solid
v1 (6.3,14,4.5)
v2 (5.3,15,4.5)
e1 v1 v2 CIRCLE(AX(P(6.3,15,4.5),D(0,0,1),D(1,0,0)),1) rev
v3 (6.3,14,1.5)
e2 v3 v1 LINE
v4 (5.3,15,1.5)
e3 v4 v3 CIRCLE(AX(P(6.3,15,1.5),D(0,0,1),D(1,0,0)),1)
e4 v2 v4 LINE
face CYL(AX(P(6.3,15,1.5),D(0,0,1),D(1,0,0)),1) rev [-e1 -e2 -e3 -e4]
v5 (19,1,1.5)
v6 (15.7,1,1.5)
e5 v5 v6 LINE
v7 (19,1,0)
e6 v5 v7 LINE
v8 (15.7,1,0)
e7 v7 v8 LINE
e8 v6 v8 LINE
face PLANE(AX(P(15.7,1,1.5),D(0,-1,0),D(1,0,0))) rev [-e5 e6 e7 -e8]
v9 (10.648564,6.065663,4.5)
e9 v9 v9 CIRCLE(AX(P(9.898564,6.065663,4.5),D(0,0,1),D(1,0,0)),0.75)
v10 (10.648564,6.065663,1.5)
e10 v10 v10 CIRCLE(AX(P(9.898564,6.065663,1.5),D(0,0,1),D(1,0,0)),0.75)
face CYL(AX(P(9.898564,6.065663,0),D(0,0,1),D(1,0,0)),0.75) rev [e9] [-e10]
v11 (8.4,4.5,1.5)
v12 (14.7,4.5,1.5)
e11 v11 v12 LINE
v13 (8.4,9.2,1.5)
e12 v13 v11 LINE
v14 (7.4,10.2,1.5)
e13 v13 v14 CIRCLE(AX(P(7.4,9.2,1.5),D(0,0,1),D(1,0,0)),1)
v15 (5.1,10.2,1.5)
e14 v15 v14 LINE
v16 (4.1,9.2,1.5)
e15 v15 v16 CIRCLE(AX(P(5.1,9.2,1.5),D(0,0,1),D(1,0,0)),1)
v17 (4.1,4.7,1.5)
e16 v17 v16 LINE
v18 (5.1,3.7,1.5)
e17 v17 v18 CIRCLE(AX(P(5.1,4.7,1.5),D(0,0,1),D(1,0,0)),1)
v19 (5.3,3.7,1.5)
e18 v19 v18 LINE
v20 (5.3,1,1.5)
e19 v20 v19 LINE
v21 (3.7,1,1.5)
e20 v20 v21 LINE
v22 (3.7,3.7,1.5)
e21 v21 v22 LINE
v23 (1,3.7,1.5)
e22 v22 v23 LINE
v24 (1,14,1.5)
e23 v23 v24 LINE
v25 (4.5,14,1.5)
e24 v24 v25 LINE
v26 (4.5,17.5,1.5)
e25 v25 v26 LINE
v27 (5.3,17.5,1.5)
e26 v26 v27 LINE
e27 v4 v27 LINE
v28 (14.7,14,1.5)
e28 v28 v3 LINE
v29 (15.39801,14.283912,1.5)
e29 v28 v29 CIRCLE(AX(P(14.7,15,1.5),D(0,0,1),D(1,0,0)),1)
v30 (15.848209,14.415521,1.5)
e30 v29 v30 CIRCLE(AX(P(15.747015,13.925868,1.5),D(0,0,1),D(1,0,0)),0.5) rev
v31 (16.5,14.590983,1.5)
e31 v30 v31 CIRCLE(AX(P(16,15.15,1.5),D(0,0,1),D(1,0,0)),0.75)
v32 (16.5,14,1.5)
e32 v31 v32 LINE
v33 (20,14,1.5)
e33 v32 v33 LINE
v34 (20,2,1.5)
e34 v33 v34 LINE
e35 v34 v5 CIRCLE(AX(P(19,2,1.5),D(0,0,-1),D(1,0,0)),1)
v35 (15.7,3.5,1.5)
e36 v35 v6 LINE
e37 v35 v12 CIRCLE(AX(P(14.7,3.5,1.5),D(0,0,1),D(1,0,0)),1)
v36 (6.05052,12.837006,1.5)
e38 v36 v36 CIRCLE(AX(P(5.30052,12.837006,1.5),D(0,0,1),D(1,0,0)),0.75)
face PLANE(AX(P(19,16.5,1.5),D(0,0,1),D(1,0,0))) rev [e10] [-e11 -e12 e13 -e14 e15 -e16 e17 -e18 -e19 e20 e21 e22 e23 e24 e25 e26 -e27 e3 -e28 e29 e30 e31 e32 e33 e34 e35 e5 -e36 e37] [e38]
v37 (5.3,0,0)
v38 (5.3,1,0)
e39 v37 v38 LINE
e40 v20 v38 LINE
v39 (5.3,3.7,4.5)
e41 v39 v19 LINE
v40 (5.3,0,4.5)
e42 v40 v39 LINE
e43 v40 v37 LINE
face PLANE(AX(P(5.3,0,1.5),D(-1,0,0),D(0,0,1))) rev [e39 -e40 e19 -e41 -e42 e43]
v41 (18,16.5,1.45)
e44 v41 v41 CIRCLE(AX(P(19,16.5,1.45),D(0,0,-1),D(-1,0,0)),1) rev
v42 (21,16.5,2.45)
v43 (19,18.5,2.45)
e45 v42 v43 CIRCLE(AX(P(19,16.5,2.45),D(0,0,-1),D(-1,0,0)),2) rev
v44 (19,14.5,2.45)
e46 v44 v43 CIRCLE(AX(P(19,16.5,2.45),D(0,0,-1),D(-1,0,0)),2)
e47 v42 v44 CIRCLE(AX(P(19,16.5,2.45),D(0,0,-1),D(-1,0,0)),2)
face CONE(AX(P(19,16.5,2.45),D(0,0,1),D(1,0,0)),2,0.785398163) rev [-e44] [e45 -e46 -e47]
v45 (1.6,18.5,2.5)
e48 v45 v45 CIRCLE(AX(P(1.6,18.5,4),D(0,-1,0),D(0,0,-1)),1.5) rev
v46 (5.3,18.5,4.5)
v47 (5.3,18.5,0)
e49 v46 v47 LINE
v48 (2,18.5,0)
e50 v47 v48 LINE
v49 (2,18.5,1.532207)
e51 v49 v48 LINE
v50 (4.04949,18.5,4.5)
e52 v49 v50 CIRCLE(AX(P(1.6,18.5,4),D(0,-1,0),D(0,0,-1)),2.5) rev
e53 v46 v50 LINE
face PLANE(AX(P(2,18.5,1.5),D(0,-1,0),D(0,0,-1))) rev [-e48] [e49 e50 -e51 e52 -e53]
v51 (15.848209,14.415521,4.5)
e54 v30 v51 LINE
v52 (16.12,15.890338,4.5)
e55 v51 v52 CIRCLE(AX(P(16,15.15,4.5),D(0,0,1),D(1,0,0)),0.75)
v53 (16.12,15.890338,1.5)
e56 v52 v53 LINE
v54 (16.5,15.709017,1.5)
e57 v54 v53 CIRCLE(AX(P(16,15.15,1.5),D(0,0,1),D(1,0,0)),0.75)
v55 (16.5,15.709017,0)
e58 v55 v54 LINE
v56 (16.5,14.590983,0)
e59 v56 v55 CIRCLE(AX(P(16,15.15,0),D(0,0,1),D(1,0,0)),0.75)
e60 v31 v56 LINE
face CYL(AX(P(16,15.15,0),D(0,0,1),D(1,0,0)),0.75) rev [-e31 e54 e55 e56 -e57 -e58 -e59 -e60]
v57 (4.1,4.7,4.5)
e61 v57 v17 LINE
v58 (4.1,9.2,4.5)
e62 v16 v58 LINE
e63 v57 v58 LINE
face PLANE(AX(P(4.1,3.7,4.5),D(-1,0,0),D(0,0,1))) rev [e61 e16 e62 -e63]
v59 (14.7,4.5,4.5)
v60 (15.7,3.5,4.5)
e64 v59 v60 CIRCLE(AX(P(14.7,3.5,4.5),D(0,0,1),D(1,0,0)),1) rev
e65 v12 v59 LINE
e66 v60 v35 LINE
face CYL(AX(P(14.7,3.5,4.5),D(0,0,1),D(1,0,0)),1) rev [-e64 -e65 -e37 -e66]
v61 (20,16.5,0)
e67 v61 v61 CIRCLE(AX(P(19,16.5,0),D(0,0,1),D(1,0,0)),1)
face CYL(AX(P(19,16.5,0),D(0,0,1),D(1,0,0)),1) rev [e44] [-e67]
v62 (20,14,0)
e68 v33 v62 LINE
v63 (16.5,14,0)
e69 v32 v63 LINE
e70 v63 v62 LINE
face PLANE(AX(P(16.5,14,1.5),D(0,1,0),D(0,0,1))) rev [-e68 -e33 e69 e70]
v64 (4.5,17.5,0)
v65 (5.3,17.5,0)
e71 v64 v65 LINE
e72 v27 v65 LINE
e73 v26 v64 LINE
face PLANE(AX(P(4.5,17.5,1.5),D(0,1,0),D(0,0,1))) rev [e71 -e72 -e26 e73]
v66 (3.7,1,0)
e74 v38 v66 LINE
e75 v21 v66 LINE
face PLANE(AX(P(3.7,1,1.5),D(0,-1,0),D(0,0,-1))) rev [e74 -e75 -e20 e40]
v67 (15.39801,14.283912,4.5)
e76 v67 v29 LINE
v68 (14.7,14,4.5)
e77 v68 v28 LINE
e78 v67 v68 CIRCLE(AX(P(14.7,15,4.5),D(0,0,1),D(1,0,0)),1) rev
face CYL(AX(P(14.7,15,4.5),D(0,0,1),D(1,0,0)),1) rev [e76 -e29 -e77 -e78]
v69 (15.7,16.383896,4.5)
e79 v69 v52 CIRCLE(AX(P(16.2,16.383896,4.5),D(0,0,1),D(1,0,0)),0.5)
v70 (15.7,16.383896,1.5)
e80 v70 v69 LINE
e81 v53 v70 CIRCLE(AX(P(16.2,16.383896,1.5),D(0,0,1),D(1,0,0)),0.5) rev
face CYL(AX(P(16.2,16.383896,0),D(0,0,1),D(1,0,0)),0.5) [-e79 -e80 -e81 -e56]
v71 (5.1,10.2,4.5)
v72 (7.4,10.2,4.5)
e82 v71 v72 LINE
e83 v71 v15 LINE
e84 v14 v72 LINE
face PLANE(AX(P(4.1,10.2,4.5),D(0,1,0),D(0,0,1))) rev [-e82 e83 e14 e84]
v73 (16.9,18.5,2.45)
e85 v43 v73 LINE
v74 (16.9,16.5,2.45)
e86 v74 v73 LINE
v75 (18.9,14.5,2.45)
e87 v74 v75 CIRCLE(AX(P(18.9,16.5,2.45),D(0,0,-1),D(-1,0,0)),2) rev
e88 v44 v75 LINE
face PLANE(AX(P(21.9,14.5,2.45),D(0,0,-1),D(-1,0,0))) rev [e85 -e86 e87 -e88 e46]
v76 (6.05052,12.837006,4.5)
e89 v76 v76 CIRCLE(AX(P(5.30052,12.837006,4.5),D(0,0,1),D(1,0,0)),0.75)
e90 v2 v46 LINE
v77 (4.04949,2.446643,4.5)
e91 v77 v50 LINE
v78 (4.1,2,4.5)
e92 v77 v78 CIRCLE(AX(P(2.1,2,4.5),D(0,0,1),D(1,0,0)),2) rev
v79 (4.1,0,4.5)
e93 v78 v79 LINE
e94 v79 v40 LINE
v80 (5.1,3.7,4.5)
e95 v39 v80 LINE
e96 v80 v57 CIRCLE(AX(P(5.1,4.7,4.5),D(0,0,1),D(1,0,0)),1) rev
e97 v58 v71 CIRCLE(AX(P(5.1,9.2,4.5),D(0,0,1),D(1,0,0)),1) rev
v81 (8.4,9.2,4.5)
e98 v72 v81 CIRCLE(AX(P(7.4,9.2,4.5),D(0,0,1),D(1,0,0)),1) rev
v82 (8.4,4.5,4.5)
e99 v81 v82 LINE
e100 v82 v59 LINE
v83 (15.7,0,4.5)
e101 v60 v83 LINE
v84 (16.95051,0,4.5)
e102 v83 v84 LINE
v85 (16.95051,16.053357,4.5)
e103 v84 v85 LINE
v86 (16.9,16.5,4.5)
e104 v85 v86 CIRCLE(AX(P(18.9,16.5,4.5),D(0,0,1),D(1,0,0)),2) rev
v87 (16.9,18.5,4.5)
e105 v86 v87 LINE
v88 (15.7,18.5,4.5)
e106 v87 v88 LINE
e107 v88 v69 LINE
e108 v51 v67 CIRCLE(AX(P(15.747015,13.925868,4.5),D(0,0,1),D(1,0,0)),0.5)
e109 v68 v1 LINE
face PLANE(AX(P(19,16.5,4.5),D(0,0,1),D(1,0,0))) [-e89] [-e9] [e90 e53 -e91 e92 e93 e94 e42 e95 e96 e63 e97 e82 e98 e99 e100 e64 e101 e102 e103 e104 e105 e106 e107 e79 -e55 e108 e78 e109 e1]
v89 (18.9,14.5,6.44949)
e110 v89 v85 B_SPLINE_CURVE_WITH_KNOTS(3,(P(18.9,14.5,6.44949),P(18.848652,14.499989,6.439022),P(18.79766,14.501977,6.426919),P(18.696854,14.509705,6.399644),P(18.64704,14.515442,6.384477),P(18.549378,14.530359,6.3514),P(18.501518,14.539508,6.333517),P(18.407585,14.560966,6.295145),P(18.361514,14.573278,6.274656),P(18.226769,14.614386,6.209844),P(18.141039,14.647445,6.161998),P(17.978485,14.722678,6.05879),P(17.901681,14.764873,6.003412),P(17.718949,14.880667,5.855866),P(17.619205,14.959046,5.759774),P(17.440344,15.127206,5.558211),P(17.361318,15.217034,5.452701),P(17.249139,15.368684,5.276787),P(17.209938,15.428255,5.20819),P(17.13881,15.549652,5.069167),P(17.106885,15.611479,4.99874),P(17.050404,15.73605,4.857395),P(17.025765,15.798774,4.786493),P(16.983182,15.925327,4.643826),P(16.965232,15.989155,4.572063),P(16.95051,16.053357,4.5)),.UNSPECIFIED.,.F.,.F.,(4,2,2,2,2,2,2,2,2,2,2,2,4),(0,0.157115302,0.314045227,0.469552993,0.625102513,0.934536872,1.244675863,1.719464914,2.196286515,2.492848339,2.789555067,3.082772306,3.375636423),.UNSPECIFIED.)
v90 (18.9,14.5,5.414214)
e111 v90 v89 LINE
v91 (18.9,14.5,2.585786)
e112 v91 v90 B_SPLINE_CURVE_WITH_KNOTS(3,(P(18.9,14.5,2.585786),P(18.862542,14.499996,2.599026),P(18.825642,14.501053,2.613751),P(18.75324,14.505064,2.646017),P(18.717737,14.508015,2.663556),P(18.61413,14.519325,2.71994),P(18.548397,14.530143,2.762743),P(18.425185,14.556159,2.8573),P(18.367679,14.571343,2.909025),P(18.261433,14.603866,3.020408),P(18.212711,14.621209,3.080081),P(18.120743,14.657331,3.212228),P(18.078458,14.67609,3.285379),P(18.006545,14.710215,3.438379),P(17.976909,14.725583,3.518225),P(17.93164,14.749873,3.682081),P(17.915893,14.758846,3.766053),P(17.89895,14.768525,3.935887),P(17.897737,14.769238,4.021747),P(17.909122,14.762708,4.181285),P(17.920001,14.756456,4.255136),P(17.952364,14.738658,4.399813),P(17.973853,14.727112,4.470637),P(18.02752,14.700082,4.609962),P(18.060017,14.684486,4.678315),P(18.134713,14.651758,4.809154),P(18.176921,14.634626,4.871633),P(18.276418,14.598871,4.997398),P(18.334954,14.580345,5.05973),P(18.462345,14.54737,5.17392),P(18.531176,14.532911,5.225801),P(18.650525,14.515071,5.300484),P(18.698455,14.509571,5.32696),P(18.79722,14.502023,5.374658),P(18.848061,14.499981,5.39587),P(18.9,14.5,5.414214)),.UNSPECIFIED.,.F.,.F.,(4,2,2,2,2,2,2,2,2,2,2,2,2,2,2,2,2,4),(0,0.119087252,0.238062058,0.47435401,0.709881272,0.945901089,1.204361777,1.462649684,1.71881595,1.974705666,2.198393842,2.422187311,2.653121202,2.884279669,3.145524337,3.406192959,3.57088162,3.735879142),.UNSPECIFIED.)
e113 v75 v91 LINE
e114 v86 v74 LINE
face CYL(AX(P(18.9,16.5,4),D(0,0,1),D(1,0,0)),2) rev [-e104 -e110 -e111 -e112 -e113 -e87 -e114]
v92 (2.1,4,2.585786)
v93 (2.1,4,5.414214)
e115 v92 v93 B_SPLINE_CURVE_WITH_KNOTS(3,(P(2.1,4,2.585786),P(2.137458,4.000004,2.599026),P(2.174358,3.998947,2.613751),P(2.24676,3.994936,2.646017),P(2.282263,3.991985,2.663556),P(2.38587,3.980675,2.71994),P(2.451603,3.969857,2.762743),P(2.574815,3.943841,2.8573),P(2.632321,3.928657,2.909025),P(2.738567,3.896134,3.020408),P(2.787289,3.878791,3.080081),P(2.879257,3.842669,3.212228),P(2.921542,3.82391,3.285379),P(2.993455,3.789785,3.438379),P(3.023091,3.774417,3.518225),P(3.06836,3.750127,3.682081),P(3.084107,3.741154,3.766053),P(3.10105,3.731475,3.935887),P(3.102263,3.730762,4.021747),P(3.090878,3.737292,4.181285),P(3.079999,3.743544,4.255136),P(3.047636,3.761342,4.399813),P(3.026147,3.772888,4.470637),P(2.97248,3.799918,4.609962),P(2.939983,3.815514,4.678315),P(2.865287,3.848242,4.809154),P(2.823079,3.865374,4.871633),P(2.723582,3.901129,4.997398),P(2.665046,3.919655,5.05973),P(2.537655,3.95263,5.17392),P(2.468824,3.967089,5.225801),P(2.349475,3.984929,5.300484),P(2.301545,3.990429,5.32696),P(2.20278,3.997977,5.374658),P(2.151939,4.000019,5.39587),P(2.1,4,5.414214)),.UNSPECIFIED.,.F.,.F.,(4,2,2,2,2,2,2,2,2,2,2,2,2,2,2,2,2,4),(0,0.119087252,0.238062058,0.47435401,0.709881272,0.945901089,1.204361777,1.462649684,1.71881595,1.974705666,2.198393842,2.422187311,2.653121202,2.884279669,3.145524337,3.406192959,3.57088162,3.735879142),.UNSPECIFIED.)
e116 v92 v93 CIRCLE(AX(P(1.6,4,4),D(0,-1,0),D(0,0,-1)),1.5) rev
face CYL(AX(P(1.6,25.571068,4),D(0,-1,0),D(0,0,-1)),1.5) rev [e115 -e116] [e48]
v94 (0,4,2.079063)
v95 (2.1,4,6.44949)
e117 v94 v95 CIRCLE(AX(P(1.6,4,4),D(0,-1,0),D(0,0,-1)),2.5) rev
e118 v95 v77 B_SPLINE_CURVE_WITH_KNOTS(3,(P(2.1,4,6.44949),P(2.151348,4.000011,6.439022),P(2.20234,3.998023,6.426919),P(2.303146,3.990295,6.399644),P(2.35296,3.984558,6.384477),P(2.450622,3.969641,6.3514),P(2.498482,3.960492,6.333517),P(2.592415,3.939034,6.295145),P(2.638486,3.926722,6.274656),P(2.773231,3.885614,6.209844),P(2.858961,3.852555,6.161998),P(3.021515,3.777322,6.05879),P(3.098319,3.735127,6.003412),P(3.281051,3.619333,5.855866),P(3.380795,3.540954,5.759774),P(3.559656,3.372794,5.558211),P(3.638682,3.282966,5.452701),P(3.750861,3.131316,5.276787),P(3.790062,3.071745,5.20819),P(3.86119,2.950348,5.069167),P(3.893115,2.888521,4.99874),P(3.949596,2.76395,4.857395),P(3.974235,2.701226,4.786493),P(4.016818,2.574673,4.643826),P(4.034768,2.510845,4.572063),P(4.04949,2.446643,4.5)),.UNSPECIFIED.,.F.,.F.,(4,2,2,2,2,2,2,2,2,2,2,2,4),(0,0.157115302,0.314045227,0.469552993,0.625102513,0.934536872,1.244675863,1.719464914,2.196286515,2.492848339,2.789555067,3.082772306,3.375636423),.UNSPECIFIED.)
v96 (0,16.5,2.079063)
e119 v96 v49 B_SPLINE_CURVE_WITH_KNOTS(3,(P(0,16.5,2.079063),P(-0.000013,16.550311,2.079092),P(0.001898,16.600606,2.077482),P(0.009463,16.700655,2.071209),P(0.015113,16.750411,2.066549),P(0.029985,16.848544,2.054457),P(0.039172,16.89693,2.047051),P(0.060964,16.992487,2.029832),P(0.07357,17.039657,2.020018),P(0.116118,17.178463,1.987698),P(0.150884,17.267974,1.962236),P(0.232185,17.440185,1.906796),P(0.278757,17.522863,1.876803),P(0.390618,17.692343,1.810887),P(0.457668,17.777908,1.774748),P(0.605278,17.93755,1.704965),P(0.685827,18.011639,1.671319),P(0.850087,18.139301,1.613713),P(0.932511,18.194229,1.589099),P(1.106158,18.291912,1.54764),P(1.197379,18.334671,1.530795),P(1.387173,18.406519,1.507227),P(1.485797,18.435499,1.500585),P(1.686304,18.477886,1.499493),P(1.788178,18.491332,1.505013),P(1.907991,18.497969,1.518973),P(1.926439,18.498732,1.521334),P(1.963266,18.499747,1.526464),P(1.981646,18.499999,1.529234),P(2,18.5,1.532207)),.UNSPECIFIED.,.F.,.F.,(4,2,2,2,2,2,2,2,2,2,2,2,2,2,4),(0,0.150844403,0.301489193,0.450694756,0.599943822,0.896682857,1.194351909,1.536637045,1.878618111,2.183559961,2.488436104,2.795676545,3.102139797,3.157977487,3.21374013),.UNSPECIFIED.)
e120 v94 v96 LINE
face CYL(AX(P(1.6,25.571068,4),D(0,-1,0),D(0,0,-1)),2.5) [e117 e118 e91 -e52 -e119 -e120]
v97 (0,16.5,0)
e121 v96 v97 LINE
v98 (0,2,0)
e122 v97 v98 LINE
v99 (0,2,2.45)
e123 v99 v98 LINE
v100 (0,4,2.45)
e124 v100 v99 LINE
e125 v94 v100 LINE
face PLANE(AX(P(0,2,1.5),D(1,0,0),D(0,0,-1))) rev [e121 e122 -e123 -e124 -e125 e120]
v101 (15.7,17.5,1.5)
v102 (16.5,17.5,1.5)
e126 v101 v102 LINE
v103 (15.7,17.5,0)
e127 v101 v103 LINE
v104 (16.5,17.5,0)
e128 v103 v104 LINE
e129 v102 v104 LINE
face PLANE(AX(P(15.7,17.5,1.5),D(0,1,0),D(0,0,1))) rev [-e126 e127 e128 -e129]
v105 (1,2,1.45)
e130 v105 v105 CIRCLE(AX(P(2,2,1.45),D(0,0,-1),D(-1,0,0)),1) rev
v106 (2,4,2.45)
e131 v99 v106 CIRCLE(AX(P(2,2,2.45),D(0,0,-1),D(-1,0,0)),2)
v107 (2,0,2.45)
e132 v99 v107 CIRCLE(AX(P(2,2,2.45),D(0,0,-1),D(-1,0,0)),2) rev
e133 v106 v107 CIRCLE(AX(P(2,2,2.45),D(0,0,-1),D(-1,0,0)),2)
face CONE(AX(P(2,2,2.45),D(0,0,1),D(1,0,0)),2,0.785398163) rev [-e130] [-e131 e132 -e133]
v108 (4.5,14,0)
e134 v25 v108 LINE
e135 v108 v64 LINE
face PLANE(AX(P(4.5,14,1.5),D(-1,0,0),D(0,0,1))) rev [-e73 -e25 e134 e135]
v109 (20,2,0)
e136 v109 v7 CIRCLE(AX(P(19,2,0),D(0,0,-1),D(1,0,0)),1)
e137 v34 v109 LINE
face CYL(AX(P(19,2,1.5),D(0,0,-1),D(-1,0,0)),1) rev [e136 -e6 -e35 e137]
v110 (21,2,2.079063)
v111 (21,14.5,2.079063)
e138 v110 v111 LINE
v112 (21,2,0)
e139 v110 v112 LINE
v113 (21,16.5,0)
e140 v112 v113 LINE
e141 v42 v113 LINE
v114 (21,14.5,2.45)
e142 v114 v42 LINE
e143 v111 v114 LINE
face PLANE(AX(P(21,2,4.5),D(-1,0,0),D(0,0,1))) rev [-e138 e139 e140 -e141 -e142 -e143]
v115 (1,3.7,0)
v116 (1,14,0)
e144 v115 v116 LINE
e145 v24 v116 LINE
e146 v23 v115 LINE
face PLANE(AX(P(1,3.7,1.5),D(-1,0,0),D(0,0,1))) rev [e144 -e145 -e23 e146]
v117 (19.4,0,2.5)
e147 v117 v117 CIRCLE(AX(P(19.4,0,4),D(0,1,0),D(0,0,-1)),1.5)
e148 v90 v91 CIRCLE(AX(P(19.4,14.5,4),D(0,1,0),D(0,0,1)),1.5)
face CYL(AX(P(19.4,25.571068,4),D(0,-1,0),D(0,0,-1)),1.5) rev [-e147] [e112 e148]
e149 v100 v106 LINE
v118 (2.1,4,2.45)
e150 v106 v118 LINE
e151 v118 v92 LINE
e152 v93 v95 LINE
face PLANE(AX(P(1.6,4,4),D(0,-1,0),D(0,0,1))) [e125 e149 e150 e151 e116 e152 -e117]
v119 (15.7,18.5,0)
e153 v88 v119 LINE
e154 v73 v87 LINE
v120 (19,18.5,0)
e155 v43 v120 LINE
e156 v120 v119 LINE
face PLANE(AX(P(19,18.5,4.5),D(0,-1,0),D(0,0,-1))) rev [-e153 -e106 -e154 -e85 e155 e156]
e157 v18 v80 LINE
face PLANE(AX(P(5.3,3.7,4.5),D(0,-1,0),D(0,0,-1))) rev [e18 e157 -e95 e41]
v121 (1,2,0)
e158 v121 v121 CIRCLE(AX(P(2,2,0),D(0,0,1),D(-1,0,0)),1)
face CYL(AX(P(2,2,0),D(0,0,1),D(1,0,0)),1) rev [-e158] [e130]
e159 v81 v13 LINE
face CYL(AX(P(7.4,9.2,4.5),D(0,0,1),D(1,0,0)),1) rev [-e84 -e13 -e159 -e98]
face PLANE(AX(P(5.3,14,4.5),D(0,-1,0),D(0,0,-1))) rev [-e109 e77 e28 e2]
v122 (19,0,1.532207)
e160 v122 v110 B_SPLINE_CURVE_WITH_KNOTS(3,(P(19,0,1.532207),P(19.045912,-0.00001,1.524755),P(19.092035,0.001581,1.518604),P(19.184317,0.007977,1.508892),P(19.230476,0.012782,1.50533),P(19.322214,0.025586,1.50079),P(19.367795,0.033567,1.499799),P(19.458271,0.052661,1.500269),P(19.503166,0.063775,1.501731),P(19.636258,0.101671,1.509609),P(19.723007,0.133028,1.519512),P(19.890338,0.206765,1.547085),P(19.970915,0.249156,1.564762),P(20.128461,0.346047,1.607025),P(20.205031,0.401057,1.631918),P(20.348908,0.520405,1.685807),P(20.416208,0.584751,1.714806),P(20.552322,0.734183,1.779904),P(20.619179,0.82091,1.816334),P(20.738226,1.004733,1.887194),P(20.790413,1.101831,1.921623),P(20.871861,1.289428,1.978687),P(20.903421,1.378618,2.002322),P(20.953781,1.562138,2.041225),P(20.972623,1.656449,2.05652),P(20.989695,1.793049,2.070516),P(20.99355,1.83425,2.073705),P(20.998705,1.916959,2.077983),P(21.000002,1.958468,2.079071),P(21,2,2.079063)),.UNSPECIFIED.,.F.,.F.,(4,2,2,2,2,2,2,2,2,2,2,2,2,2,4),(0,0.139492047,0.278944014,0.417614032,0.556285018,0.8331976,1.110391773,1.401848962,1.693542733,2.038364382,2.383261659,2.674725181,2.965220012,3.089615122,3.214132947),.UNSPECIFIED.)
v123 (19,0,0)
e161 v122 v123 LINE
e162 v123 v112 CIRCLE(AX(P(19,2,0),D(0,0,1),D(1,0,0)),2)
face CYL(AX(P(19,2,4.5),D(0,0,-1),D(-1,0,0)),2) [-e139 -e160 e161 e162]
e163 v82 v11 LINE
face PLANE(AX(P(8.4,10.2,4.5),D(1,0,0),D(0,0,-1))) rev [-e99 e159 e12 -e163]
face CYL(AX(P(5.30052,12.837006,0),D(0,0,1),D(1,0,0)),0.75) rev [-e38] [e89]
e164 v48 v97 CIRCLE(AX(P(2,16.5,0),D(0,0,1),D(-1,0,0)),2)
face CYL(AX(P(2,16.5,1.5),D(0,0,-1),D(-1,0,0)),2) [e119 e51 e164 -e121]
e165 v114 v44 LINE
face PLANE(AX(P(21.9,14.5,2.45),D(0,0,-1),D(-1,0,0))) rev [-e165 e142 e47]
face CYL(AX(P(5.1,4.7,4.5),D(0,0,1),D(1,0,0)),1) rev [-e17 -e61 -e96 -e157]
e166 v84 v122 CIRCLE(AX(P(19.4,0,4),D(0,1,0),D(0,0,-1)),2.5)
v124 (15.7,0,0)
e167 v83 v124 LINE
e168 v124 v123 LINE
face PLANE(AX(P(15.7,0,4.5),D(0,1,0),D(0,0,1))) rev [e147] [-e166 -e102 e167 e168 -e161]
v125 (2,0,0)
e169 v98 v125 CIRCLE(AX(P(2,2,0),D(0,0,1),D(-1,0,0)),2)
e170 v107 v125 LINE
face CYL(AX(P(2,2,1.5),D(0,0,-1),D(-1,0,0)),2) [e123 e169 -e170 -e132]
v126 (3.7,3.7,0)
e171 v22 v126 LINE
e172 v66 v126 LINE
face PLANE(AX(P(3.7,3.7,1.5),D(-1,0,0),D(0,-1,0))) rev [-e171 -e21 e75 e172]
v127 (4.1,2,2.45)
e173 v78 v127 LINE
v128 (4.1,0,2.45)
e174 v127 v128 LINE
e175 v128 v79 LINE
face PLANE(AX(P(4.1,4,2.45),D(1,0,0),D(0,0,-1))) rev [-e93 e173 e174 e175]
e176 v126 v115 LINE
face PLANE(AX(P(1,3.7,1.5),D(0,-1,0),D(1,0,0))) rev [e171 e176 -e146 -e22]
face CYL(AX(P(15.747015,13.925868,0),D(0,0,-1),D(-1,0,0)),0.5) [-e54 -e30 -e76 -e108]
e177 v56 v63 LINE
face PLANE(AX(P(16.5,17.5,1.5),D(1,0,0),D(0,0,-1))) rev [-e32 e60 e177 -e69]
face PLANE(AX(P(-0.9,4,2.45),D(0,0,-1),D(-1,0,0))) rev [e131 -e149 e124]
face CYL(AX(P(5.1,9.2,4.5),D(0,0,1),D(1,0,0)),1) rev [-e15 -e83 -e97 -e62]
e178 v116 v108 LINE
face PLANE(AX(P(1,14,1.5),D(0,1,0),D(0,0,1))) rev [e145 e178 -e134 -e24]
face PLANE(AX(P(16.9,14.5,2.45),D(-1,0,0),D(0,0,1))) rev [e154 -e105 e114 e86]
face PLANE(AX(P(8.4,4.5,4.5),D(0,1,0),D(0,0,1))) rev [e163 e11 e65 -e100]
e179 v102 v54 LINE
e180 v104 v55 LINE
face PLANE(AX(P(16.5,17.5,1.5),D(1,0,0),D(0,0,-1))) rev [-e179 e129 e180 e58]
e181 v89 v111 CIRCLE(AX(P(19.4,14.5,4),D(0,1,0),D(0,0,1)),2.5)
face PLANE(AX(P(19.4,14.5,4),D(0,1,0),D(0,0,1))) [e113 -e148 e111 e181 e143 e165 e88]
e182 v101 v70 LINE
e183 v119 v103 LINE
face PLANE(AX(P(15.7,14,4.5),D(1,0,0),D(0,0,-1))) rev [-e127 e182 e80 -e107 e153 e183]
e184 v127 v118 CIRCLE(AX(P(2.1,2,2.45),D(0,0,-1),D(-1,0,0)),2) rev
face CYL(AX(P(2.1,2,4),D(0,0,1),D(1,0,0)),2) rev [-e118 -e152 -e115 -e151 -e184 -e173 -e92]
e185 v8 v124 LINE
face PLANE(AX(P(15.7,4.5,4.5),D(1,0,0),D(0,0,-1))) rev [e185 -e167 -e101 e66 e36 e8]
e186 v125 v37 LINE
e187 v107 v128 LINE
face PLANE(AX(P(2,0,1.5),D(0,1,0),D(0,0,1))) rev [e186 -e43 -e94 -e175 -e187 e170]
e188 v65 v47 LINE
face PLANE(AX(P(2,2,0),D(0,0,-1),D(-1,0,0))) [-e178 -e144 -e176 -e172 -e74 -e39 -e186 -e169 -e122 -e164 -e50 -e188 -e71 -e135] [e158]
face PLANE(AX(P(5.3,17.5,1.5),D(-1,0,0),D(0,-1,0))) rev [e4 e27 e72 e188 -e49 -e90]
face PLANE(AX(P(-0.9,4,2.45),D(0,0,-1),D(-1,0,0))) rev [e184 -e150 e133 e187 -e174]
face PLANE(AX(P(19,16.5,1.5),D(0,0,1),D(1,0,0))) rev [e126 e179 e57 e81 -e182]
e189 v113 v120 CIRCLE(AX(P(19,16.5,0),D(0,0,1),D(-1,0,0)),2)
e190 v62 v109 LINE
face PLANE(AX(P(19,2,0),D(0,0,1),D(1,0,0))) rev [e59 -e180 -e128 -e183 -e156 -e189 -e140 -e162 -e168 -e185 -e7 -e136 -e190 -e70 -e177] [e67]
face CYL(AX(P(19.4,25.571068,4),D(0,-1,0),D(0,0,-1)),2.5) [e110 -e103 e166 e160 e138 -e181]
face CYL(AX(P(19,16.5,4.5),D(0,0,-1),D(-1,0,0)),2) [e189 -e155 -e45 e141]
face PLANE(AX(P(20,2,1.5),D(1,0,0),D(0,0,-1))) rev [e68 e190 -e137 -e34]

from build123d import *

# Parameters (mm, degrees)
BOSS_EXTRUDE1_DEPTH          = 1.5
BOSS_EXTRUDE1_2_DEPTH        = 1.5
BOSS_EXTRUDE2_DEPTH          = 3
FILLET1_R                    = 1
SKETCH3_R                    = 0.75
CUT_EXTRUDE2_DEPTH           = 29.346075566
FILLET2_R                    = 0.5
BOSS_EXTRUDE3_REACH          = 30.346
SKETCH4_R                    = 2.5
SKETCH4_R_2                  = 1.5
CUT_EXTRUDE3_DEPTH           = 29.731515957
CUT_EXTRUDE5_START           = -4
CUT_EXTRUDE5_DEPTH           = 4
SKETCH7_R                    = 1
CUT_EXTRUDE6_DEPTH           = 29.952763407
CHAMFER1_SIZE                = 1
CIRPATTERN1_COUNT            = 2
CHAMFER1_OF_CIRPATTERN1_SIZE = 1
FILLET3_R                    = 2


# Some blends are built 0.0001 mm under size
with BuildPart() as part:
    # Sketch1 → Boss-Extrude1 (new body)
    with BuildSketch(Plane.XY):
        with BuildLine():
            Line((2, 0), (5.3, 0))
            Line((5.3, 0), (5.3, 1))
            Line((5.3, 1), (3.7, 1))
            Line((3.7, 1), (3.7, 3.7))
            Line((3.7, 3.7), (1, 3.7))
            Line((1, 3.7), (1, 14))
            Line((1, 14), (4.5, 14))
            Line((4.5, 14), (4.5, 17.5))
            Line((4.5, 17.5), (5.3, 17.5))
            Line((5.3, 17.5), (5.3, 18.5))
            Line((5.3, 18.5), (2, 18.5))
            ThreePointArc((2, 18.5), (0.585786438, 17.914213562), (0, 16.5))
            Line((0, 16.5), (0, 2))
            ThreePointArc((0, 2), (0.585786438, 0.585786438), (2, 0))
        make_face()
    extrude(amount=BOSS_EXTRUDE1_DEPTH)



with BuildPart() as body_2:
    # Sketch1 → Boss-Extrude1 2 (new body)
    with BuildSketch(Plane.XY):
        with BuildLine():
            Line((21, 2), (21, 16.5))
            ThreePointArc((21, 16.5), (20.414213562, 17.914213562), (19, 18.5))
            Line((19, 18.5), (15.7, 18.5))
            Line((15.7, 18.5), (15.7, 17.5))
            Line((15.7, 17.5), (16.5, 17.5))
            Line((16.5, 17.5), (16.5, 14))
            Line((16.5, 14), (20, 14))
            Line((20, 14), (20, 2))
            ThreePointArc((20, 2), (19.707106781, 1.292893219), (19, 1))
            Line((19, 1), (15.7, 1))
            Line((15.7, 1), (15.7, 0))
            Line((15.7, 0), (19, 0))
            ThreePointArc((19, 0), (20.414213562, 0.585786438), (21, 2))
        make_face()
    extrude(amount=BOSS_EXTRUDE1_2_DEPTH)


with BuildPart() as part_1:
    add(part.part)

    add(body_2.part)  # Boss-Extrude2 merges body 2
    # Sketch2 → Boss-Extrude2 (add)
    with BuildSketch(Plane.XY.offset(1.5)):
        with BuildLine():
            Line((19, 18.5), (15.7, 18.5))
            Line((15.7, 18.5), (15.7, 14))
            Line((15.7, 14), (5.3, 14))
            Line((5.3, 14), (5.3, 18.5))
            Line((5.3, 18.5), (2, 18.5))
            ThreePointArc((2, 18.5), (0.585786438, 17.914213562), (0, 16.5))
            Line((0, 16.5), (0, 2))
            ThreePointArc((0, 2), (0.585786438, 0.585786438), (2, 0))
            Line((2, 0), (5.3, 0))
            Line((5.3, 0), (5.3, 3.7))
            Line((5.3, 3.7), (4.1, 3.7))
            Line((4.1, 3.7), (4.1, 10.2))
            Line((4.1, 10.2), (8.4, 10.2))
            Line((8.4, 10.2), (8.4, 4.5))
            Line((8.4, 4.5), (15.7, 4.5))
            Line((15.7, 4.5), (15.7, 0))
            Line((15.7, 0), (19, 0))
            ThreePointArc((19, 0), (20.414213562, 0.585786438), (21, 2))
            Line((21, 2), (21, 16.5))
            ThreePointArc((21, 16.5), (20.414213562, 17.914213562), (19, 18.5))
        make_face()
    extrude(amount=BOSS_EXTRUDE2_DEPTH)

    # Fillet1
    fillet1_edges = [part_1.edges().sort_by_distance(p)[0] for p in [
        (15.7, 14, 3),
        (5.3, 14, 3),
        (4.1, 3.7, 3),
        (4.1, 10.2, 3),
        (8.4, 10.2, 3),
        (15.7, 4.5, 3),
    ]]
    fillet(fillet1_edges, radius=FILLET1_R)

    # Sketch3 → Cut-Extrude2 (cut, through all)
    with BuildSketch(Plane.XY.offset(4.5)):
        with Locations((9.898564471, 6.065663219)):
            Circle(SKETCH3_R)
        with Locations((5.3005196, 12.837006018)):
            Circle(SKETCH3_R)
        with Locations((16, 15.15)):
            Circle(SKETCH3_R)
    extrude(amount=-CUT_EXTRUDE2_DEPTH, mode=Mode.SUBTRACT)

    # Fillet2
    fillet2_edges = [part_1.edges().sort_by_distance(p)[0] for p in [
        (15.581422532, 14.527671386, 3),
        (15.7, 15.837386354, 3),
    ]]
    fillet(fillet2_edges, radius=FILLET2_R)

    # Boss-Extrude3: up to this face of the body (flat: up to its plane)
    boss_extrude3_end = Plane(part_1.part.faces().sort_by_distance((3.65, 18.5, 2.25))[0])
    # Sketch4 → Boss-Extrude3 (add, up to the picked face)
    with BuildSketch(Plane.XZ, mode=Mode.PRIVATE) as boss_extrude3_sk1:
        with Locations((1.6, 4)):
            Circle(SKETCH4_R)
        with Locations((1.6, 4)):
            Circle(SKETCH4_R_2, mode=Mode.SUBTRACT)
    boss_extrude3_tool1 = split(extrude(boss_extrude3_sk1.sketch, amount=-BOSS_EXTRUDE3_REACH, mode=Mode.PRIVATE), bisect_by=boss_extrude3_end, keep=Keep.BOTH, mode=Mode.PRIVATE)
    boss_extrude3 = boss_extrude3_tool1.solids().sort_by(Axis((-0.829289, 0, 4), (0, 1, 0)))[0]
    add(boss_extrude3)

    # Sketch4<2> → Cut-Extrude3 (cut, through all)
    with BuildSketch(Plane.XZ):
        with BuildLine():
            Line((2, 4.5), (3.014213562, 4.5))
            ThreePointArc((3.014213562, 4.5), (0.269863345, 4.693351628), (2, 2.554316771))
            Line((2, 2.554316771), (2, 4.5))
        make_face()
        with BuildLine():
            ThreePointArc((3.1, 4), (3.078397839, 4.253652968), (3.014213562, 4.5))
            Line((3.014213562, 4.5), (2, 4.5))
            Line((2, 4.5), (2, 2.554316771))
            ThreePointArc((2, 2.554316771), (2.793733639, 3.091704894), (3.1, 4))
        make_face()
    cut_extrude3 = extrude(amount=-CUT_EXTRUDE3_DEPTH, mode=Mode.SUBTRACT)

    # Mirror1: Boss-Extrude3, Cut-Extrude3 across plane
    add(boss_extrude3.mirror(Plane.ZY.offset(-10.5)))
    add(cut_extrude3.mirror(Plane.ZY.offset(-10.5)), mode=Mode.SUBTRACT)

    # Sketch6 → Cut-Extrude5 (cut)
    with BuildSketch(Plane(origin=(0, 18.5, 0), x_dir=(1, 0, 0), z_dir=(0, 1, 0)).offset(CUT_EXTRUDE5_START)):
        with BuildLine():
            Line((21.9, -2.45), (16.9, -2.45))
            Line((16.9, -2.45), (16.9, -4.5))
            Line((16.9, -4.5), (17.092307692, -4.961538462))
            ThreePointArc((17.092307692, -4.961538462), (19.890290338, -6.451451689), (21.9, -4))
            Line((21.9, -4), (21.9, -2.45))
        make_face()
    cut_extrude5 = extrude(amount=CUT_EXTRUDE5_DEPTH, mode=Mode.SUBTRACT)

    # Sketch7 → Cut-Extrude6 (cut, symmetric)
    with BuildSketch(Plane.XY.offset(2.45)):
        with Locations((19, 16.5)):
            Circle(SKETCH7_R)
        with BuildLine():
            Line((21, 14.5), (21, 16.5))
            ThreePointArc((21, 16.5), (20.414213562, 17.914213562), (19, 18.5))
            Line((19, 18.5), (16.9, 18.5))
            Line((16.9, 18.5), (16.9, 19.5))
            Line((16.9, 19.5), (22, 19.5))
            Line((22, 19.5), (22, 14.5))
            Line((22, 14.5), (21, 14.5))
        make_face()
    cut_extrude6 = extrude(amount=CUT_EXTRUDE6_DEPTH, both=True, mode=Mode.SUBTRACT)

    # Chamfer1
    chamfer1_edges = [part_1.edges().sort_by_distance(p)[0] for p in [
        (18, 16.5, 2.45),
    ]]
    chamfer(chamfer1_edges, length=CHAMFER1_SIZE - 0.0001)  # a hair under: the kernel refuses the full size

    # CirPattern1: Cut-Extrude5, Cut-Extrude6 ×2 about axis
    cirpattern1_axis = Axis((10.5, 9.25, 0), (0, 0, 1))
    add([cut_extrude5.rotate(cirpattern1_axis, i * 360 / CIRPATTERN1_COUNT) for i in range(1, CIRPATTERN1_COUNT)], mode=Mode.SUBTRACT)
    add([cut_extrude6.rotate(cirpattern1_axis, i * 360 / CIRPATTERN1_COUNT) for i in range(1, CIRPATTERN1_COUNT)], mode=Mode.SUBTRACT)

    # Chamfer1 of CirPattern1
    chamfer1_of_cirpattern1_edges = [part_1.edges().sort_by_distance(p)[0] for p in [
        (3, 2, 2.45),
    ]]
    chamfer(chamfer1_of_cirpattern1_edges, length=CHAMFER1_OF_CIRPATTERN1_SIZE - 0.0001)  # a hair under: the kernel refuses the full size

    # Fillet3
    # the kernel refuses this fillet: 2 mm, written as the material it adds along each edge
    with BuildSketch(Plane(origin=(4.1, 4, -2.55), x_dir=(-1, 0, 0), z_dir=(0, 0, 1))) as fillet3_piece_1_section:
        with BuildLine():
            CenterArc((FILLET3_R, FILLET3_R), FILLET3_R, 180, 90)
            Line((0, FILLET3_R), (0, 0))
            Line((0, 0), (FILLET3_R, 0))
        make_face()
    fillet3_piece_1 = extrude(amount=7.05, mode=Mode.PRIVATE)
    fillet3_piece_1 = split(fillet3_piece_1, bisect_by=Plane(origin=(3.649361997, 3.29823616, 1.5), z_dir=(0, 0, 1)), keep=Keep.TOP, mode=Mode.PRIVATE)
    fillet3_piece_1 = fillet3_piece_1 - Plane(origin=(1.6, 3.29823616, 4), x_dir=(1, 0, 0), z_dir=(0, -1, 0)) * Cylinder(1.5, 23, mode=Mode.PRIVATE)
    add(fillet3_piece_1)
    with BuildSketch(Plane(origin=(4.1, 4, -2.55), x_dir=(-1, 0, 0), z_dir=(0, 0, 1))) as fillet3_piece_2_section:
        with BuildLine():
            CenterArc((FILLET3_R, FILLET3_R), FILLET3_R, 180, 90)
            Line((0, FILLET3_R), (0, 0))
            Line((0, 0), (FILLET3_R, 0))
        make_face()
    fillet3_piece_2 = extrude(amount=12.05, mode=Mode.PRIVATE)
    fillet3_piece_2 = fillet3_piece_2 & Plane(origin=(1.6, 3.552217846, 4), x_dir=(1, 0, 0), z_dir=(0, -1, 0)) * Cylinder(2.5, 33, mode=Mode.PRIVATE)
    fillet3_piece_2 = fillet3_piece_2 - Plane(origin=(1.6, 3.552217846, 4), x_dir=(1, 0, 0), z_dir=(0, -1, 0)) * Cylinder(1.5, 33, mode=Mode.PRIVATE)
    add(fillet3_piece_2)
    with BuildSketch(Plane(origin=(16.9, 14.5, 2.45), x_dir=(0, 1, 0), z_dir=(0, 0, 1))) as fillet3_piece_3_section:
        with BuildLine():
            CenterArc((FILLET3_R, -FILLET3_R), FILLET3_R, 90, 90)
            Line((0, -FILLET3_R), (0, 0))
            Line((0, 0), (FILLET3_R, 0))
        make_face()
    fillet3_piece_3 = extrude(amount=2.05, mode=Mode.PRIVATE)
    fillet3_piece_3 = fillet3_piece_3 - Plane(origin=(19.4, 16.248723261, 4), x_dir=(-1, 0, 0), z_dir=(0, -1, 0)) * Cylinder(1.5, 13, mode=Mode.PRIVATE)
    add(fillet3_piece_3)
    with BuildSketch(Plane(origin=(16.9, 14.5, -2.55), x_dir=(0, 1, 0), z_dir=(0, 0, 1))) as fillet3_piece_4_section:
        with BuildLine():
            CenterArc((FILLET3_R, -FILLET3_R), FILLET3_R, 90, 90)
            Line((0, -FILLET3_R), (0, 0))
            Line((0, 0), (FILLET3_R, 0))
        make_face()
    fillet3_piece_4 = extrude(amount=12.05, mode=Mode.PRIVATE)
    fillet3_piece_4 = fillet3_piece_4 & Plane(origin=(19.4, 14.798670753, 4), x_dir=(-1, 0, 0), z_dir=(0, -1, 0)) * Cylinder(2.5, 33, mode=Mode.PRIVATE)
    fillet3_piece_4 = fillet3_piece_4 - Plane(origin=(19.4, 14.798670753, 4), x_dir=(-1, 0, 0), z_dir=(0, -1, 0)) * Cylinder(1.5, 33, mode=Mode.PRIVATE)
    add(fillet3_piece_4)


solid = part_1.part
